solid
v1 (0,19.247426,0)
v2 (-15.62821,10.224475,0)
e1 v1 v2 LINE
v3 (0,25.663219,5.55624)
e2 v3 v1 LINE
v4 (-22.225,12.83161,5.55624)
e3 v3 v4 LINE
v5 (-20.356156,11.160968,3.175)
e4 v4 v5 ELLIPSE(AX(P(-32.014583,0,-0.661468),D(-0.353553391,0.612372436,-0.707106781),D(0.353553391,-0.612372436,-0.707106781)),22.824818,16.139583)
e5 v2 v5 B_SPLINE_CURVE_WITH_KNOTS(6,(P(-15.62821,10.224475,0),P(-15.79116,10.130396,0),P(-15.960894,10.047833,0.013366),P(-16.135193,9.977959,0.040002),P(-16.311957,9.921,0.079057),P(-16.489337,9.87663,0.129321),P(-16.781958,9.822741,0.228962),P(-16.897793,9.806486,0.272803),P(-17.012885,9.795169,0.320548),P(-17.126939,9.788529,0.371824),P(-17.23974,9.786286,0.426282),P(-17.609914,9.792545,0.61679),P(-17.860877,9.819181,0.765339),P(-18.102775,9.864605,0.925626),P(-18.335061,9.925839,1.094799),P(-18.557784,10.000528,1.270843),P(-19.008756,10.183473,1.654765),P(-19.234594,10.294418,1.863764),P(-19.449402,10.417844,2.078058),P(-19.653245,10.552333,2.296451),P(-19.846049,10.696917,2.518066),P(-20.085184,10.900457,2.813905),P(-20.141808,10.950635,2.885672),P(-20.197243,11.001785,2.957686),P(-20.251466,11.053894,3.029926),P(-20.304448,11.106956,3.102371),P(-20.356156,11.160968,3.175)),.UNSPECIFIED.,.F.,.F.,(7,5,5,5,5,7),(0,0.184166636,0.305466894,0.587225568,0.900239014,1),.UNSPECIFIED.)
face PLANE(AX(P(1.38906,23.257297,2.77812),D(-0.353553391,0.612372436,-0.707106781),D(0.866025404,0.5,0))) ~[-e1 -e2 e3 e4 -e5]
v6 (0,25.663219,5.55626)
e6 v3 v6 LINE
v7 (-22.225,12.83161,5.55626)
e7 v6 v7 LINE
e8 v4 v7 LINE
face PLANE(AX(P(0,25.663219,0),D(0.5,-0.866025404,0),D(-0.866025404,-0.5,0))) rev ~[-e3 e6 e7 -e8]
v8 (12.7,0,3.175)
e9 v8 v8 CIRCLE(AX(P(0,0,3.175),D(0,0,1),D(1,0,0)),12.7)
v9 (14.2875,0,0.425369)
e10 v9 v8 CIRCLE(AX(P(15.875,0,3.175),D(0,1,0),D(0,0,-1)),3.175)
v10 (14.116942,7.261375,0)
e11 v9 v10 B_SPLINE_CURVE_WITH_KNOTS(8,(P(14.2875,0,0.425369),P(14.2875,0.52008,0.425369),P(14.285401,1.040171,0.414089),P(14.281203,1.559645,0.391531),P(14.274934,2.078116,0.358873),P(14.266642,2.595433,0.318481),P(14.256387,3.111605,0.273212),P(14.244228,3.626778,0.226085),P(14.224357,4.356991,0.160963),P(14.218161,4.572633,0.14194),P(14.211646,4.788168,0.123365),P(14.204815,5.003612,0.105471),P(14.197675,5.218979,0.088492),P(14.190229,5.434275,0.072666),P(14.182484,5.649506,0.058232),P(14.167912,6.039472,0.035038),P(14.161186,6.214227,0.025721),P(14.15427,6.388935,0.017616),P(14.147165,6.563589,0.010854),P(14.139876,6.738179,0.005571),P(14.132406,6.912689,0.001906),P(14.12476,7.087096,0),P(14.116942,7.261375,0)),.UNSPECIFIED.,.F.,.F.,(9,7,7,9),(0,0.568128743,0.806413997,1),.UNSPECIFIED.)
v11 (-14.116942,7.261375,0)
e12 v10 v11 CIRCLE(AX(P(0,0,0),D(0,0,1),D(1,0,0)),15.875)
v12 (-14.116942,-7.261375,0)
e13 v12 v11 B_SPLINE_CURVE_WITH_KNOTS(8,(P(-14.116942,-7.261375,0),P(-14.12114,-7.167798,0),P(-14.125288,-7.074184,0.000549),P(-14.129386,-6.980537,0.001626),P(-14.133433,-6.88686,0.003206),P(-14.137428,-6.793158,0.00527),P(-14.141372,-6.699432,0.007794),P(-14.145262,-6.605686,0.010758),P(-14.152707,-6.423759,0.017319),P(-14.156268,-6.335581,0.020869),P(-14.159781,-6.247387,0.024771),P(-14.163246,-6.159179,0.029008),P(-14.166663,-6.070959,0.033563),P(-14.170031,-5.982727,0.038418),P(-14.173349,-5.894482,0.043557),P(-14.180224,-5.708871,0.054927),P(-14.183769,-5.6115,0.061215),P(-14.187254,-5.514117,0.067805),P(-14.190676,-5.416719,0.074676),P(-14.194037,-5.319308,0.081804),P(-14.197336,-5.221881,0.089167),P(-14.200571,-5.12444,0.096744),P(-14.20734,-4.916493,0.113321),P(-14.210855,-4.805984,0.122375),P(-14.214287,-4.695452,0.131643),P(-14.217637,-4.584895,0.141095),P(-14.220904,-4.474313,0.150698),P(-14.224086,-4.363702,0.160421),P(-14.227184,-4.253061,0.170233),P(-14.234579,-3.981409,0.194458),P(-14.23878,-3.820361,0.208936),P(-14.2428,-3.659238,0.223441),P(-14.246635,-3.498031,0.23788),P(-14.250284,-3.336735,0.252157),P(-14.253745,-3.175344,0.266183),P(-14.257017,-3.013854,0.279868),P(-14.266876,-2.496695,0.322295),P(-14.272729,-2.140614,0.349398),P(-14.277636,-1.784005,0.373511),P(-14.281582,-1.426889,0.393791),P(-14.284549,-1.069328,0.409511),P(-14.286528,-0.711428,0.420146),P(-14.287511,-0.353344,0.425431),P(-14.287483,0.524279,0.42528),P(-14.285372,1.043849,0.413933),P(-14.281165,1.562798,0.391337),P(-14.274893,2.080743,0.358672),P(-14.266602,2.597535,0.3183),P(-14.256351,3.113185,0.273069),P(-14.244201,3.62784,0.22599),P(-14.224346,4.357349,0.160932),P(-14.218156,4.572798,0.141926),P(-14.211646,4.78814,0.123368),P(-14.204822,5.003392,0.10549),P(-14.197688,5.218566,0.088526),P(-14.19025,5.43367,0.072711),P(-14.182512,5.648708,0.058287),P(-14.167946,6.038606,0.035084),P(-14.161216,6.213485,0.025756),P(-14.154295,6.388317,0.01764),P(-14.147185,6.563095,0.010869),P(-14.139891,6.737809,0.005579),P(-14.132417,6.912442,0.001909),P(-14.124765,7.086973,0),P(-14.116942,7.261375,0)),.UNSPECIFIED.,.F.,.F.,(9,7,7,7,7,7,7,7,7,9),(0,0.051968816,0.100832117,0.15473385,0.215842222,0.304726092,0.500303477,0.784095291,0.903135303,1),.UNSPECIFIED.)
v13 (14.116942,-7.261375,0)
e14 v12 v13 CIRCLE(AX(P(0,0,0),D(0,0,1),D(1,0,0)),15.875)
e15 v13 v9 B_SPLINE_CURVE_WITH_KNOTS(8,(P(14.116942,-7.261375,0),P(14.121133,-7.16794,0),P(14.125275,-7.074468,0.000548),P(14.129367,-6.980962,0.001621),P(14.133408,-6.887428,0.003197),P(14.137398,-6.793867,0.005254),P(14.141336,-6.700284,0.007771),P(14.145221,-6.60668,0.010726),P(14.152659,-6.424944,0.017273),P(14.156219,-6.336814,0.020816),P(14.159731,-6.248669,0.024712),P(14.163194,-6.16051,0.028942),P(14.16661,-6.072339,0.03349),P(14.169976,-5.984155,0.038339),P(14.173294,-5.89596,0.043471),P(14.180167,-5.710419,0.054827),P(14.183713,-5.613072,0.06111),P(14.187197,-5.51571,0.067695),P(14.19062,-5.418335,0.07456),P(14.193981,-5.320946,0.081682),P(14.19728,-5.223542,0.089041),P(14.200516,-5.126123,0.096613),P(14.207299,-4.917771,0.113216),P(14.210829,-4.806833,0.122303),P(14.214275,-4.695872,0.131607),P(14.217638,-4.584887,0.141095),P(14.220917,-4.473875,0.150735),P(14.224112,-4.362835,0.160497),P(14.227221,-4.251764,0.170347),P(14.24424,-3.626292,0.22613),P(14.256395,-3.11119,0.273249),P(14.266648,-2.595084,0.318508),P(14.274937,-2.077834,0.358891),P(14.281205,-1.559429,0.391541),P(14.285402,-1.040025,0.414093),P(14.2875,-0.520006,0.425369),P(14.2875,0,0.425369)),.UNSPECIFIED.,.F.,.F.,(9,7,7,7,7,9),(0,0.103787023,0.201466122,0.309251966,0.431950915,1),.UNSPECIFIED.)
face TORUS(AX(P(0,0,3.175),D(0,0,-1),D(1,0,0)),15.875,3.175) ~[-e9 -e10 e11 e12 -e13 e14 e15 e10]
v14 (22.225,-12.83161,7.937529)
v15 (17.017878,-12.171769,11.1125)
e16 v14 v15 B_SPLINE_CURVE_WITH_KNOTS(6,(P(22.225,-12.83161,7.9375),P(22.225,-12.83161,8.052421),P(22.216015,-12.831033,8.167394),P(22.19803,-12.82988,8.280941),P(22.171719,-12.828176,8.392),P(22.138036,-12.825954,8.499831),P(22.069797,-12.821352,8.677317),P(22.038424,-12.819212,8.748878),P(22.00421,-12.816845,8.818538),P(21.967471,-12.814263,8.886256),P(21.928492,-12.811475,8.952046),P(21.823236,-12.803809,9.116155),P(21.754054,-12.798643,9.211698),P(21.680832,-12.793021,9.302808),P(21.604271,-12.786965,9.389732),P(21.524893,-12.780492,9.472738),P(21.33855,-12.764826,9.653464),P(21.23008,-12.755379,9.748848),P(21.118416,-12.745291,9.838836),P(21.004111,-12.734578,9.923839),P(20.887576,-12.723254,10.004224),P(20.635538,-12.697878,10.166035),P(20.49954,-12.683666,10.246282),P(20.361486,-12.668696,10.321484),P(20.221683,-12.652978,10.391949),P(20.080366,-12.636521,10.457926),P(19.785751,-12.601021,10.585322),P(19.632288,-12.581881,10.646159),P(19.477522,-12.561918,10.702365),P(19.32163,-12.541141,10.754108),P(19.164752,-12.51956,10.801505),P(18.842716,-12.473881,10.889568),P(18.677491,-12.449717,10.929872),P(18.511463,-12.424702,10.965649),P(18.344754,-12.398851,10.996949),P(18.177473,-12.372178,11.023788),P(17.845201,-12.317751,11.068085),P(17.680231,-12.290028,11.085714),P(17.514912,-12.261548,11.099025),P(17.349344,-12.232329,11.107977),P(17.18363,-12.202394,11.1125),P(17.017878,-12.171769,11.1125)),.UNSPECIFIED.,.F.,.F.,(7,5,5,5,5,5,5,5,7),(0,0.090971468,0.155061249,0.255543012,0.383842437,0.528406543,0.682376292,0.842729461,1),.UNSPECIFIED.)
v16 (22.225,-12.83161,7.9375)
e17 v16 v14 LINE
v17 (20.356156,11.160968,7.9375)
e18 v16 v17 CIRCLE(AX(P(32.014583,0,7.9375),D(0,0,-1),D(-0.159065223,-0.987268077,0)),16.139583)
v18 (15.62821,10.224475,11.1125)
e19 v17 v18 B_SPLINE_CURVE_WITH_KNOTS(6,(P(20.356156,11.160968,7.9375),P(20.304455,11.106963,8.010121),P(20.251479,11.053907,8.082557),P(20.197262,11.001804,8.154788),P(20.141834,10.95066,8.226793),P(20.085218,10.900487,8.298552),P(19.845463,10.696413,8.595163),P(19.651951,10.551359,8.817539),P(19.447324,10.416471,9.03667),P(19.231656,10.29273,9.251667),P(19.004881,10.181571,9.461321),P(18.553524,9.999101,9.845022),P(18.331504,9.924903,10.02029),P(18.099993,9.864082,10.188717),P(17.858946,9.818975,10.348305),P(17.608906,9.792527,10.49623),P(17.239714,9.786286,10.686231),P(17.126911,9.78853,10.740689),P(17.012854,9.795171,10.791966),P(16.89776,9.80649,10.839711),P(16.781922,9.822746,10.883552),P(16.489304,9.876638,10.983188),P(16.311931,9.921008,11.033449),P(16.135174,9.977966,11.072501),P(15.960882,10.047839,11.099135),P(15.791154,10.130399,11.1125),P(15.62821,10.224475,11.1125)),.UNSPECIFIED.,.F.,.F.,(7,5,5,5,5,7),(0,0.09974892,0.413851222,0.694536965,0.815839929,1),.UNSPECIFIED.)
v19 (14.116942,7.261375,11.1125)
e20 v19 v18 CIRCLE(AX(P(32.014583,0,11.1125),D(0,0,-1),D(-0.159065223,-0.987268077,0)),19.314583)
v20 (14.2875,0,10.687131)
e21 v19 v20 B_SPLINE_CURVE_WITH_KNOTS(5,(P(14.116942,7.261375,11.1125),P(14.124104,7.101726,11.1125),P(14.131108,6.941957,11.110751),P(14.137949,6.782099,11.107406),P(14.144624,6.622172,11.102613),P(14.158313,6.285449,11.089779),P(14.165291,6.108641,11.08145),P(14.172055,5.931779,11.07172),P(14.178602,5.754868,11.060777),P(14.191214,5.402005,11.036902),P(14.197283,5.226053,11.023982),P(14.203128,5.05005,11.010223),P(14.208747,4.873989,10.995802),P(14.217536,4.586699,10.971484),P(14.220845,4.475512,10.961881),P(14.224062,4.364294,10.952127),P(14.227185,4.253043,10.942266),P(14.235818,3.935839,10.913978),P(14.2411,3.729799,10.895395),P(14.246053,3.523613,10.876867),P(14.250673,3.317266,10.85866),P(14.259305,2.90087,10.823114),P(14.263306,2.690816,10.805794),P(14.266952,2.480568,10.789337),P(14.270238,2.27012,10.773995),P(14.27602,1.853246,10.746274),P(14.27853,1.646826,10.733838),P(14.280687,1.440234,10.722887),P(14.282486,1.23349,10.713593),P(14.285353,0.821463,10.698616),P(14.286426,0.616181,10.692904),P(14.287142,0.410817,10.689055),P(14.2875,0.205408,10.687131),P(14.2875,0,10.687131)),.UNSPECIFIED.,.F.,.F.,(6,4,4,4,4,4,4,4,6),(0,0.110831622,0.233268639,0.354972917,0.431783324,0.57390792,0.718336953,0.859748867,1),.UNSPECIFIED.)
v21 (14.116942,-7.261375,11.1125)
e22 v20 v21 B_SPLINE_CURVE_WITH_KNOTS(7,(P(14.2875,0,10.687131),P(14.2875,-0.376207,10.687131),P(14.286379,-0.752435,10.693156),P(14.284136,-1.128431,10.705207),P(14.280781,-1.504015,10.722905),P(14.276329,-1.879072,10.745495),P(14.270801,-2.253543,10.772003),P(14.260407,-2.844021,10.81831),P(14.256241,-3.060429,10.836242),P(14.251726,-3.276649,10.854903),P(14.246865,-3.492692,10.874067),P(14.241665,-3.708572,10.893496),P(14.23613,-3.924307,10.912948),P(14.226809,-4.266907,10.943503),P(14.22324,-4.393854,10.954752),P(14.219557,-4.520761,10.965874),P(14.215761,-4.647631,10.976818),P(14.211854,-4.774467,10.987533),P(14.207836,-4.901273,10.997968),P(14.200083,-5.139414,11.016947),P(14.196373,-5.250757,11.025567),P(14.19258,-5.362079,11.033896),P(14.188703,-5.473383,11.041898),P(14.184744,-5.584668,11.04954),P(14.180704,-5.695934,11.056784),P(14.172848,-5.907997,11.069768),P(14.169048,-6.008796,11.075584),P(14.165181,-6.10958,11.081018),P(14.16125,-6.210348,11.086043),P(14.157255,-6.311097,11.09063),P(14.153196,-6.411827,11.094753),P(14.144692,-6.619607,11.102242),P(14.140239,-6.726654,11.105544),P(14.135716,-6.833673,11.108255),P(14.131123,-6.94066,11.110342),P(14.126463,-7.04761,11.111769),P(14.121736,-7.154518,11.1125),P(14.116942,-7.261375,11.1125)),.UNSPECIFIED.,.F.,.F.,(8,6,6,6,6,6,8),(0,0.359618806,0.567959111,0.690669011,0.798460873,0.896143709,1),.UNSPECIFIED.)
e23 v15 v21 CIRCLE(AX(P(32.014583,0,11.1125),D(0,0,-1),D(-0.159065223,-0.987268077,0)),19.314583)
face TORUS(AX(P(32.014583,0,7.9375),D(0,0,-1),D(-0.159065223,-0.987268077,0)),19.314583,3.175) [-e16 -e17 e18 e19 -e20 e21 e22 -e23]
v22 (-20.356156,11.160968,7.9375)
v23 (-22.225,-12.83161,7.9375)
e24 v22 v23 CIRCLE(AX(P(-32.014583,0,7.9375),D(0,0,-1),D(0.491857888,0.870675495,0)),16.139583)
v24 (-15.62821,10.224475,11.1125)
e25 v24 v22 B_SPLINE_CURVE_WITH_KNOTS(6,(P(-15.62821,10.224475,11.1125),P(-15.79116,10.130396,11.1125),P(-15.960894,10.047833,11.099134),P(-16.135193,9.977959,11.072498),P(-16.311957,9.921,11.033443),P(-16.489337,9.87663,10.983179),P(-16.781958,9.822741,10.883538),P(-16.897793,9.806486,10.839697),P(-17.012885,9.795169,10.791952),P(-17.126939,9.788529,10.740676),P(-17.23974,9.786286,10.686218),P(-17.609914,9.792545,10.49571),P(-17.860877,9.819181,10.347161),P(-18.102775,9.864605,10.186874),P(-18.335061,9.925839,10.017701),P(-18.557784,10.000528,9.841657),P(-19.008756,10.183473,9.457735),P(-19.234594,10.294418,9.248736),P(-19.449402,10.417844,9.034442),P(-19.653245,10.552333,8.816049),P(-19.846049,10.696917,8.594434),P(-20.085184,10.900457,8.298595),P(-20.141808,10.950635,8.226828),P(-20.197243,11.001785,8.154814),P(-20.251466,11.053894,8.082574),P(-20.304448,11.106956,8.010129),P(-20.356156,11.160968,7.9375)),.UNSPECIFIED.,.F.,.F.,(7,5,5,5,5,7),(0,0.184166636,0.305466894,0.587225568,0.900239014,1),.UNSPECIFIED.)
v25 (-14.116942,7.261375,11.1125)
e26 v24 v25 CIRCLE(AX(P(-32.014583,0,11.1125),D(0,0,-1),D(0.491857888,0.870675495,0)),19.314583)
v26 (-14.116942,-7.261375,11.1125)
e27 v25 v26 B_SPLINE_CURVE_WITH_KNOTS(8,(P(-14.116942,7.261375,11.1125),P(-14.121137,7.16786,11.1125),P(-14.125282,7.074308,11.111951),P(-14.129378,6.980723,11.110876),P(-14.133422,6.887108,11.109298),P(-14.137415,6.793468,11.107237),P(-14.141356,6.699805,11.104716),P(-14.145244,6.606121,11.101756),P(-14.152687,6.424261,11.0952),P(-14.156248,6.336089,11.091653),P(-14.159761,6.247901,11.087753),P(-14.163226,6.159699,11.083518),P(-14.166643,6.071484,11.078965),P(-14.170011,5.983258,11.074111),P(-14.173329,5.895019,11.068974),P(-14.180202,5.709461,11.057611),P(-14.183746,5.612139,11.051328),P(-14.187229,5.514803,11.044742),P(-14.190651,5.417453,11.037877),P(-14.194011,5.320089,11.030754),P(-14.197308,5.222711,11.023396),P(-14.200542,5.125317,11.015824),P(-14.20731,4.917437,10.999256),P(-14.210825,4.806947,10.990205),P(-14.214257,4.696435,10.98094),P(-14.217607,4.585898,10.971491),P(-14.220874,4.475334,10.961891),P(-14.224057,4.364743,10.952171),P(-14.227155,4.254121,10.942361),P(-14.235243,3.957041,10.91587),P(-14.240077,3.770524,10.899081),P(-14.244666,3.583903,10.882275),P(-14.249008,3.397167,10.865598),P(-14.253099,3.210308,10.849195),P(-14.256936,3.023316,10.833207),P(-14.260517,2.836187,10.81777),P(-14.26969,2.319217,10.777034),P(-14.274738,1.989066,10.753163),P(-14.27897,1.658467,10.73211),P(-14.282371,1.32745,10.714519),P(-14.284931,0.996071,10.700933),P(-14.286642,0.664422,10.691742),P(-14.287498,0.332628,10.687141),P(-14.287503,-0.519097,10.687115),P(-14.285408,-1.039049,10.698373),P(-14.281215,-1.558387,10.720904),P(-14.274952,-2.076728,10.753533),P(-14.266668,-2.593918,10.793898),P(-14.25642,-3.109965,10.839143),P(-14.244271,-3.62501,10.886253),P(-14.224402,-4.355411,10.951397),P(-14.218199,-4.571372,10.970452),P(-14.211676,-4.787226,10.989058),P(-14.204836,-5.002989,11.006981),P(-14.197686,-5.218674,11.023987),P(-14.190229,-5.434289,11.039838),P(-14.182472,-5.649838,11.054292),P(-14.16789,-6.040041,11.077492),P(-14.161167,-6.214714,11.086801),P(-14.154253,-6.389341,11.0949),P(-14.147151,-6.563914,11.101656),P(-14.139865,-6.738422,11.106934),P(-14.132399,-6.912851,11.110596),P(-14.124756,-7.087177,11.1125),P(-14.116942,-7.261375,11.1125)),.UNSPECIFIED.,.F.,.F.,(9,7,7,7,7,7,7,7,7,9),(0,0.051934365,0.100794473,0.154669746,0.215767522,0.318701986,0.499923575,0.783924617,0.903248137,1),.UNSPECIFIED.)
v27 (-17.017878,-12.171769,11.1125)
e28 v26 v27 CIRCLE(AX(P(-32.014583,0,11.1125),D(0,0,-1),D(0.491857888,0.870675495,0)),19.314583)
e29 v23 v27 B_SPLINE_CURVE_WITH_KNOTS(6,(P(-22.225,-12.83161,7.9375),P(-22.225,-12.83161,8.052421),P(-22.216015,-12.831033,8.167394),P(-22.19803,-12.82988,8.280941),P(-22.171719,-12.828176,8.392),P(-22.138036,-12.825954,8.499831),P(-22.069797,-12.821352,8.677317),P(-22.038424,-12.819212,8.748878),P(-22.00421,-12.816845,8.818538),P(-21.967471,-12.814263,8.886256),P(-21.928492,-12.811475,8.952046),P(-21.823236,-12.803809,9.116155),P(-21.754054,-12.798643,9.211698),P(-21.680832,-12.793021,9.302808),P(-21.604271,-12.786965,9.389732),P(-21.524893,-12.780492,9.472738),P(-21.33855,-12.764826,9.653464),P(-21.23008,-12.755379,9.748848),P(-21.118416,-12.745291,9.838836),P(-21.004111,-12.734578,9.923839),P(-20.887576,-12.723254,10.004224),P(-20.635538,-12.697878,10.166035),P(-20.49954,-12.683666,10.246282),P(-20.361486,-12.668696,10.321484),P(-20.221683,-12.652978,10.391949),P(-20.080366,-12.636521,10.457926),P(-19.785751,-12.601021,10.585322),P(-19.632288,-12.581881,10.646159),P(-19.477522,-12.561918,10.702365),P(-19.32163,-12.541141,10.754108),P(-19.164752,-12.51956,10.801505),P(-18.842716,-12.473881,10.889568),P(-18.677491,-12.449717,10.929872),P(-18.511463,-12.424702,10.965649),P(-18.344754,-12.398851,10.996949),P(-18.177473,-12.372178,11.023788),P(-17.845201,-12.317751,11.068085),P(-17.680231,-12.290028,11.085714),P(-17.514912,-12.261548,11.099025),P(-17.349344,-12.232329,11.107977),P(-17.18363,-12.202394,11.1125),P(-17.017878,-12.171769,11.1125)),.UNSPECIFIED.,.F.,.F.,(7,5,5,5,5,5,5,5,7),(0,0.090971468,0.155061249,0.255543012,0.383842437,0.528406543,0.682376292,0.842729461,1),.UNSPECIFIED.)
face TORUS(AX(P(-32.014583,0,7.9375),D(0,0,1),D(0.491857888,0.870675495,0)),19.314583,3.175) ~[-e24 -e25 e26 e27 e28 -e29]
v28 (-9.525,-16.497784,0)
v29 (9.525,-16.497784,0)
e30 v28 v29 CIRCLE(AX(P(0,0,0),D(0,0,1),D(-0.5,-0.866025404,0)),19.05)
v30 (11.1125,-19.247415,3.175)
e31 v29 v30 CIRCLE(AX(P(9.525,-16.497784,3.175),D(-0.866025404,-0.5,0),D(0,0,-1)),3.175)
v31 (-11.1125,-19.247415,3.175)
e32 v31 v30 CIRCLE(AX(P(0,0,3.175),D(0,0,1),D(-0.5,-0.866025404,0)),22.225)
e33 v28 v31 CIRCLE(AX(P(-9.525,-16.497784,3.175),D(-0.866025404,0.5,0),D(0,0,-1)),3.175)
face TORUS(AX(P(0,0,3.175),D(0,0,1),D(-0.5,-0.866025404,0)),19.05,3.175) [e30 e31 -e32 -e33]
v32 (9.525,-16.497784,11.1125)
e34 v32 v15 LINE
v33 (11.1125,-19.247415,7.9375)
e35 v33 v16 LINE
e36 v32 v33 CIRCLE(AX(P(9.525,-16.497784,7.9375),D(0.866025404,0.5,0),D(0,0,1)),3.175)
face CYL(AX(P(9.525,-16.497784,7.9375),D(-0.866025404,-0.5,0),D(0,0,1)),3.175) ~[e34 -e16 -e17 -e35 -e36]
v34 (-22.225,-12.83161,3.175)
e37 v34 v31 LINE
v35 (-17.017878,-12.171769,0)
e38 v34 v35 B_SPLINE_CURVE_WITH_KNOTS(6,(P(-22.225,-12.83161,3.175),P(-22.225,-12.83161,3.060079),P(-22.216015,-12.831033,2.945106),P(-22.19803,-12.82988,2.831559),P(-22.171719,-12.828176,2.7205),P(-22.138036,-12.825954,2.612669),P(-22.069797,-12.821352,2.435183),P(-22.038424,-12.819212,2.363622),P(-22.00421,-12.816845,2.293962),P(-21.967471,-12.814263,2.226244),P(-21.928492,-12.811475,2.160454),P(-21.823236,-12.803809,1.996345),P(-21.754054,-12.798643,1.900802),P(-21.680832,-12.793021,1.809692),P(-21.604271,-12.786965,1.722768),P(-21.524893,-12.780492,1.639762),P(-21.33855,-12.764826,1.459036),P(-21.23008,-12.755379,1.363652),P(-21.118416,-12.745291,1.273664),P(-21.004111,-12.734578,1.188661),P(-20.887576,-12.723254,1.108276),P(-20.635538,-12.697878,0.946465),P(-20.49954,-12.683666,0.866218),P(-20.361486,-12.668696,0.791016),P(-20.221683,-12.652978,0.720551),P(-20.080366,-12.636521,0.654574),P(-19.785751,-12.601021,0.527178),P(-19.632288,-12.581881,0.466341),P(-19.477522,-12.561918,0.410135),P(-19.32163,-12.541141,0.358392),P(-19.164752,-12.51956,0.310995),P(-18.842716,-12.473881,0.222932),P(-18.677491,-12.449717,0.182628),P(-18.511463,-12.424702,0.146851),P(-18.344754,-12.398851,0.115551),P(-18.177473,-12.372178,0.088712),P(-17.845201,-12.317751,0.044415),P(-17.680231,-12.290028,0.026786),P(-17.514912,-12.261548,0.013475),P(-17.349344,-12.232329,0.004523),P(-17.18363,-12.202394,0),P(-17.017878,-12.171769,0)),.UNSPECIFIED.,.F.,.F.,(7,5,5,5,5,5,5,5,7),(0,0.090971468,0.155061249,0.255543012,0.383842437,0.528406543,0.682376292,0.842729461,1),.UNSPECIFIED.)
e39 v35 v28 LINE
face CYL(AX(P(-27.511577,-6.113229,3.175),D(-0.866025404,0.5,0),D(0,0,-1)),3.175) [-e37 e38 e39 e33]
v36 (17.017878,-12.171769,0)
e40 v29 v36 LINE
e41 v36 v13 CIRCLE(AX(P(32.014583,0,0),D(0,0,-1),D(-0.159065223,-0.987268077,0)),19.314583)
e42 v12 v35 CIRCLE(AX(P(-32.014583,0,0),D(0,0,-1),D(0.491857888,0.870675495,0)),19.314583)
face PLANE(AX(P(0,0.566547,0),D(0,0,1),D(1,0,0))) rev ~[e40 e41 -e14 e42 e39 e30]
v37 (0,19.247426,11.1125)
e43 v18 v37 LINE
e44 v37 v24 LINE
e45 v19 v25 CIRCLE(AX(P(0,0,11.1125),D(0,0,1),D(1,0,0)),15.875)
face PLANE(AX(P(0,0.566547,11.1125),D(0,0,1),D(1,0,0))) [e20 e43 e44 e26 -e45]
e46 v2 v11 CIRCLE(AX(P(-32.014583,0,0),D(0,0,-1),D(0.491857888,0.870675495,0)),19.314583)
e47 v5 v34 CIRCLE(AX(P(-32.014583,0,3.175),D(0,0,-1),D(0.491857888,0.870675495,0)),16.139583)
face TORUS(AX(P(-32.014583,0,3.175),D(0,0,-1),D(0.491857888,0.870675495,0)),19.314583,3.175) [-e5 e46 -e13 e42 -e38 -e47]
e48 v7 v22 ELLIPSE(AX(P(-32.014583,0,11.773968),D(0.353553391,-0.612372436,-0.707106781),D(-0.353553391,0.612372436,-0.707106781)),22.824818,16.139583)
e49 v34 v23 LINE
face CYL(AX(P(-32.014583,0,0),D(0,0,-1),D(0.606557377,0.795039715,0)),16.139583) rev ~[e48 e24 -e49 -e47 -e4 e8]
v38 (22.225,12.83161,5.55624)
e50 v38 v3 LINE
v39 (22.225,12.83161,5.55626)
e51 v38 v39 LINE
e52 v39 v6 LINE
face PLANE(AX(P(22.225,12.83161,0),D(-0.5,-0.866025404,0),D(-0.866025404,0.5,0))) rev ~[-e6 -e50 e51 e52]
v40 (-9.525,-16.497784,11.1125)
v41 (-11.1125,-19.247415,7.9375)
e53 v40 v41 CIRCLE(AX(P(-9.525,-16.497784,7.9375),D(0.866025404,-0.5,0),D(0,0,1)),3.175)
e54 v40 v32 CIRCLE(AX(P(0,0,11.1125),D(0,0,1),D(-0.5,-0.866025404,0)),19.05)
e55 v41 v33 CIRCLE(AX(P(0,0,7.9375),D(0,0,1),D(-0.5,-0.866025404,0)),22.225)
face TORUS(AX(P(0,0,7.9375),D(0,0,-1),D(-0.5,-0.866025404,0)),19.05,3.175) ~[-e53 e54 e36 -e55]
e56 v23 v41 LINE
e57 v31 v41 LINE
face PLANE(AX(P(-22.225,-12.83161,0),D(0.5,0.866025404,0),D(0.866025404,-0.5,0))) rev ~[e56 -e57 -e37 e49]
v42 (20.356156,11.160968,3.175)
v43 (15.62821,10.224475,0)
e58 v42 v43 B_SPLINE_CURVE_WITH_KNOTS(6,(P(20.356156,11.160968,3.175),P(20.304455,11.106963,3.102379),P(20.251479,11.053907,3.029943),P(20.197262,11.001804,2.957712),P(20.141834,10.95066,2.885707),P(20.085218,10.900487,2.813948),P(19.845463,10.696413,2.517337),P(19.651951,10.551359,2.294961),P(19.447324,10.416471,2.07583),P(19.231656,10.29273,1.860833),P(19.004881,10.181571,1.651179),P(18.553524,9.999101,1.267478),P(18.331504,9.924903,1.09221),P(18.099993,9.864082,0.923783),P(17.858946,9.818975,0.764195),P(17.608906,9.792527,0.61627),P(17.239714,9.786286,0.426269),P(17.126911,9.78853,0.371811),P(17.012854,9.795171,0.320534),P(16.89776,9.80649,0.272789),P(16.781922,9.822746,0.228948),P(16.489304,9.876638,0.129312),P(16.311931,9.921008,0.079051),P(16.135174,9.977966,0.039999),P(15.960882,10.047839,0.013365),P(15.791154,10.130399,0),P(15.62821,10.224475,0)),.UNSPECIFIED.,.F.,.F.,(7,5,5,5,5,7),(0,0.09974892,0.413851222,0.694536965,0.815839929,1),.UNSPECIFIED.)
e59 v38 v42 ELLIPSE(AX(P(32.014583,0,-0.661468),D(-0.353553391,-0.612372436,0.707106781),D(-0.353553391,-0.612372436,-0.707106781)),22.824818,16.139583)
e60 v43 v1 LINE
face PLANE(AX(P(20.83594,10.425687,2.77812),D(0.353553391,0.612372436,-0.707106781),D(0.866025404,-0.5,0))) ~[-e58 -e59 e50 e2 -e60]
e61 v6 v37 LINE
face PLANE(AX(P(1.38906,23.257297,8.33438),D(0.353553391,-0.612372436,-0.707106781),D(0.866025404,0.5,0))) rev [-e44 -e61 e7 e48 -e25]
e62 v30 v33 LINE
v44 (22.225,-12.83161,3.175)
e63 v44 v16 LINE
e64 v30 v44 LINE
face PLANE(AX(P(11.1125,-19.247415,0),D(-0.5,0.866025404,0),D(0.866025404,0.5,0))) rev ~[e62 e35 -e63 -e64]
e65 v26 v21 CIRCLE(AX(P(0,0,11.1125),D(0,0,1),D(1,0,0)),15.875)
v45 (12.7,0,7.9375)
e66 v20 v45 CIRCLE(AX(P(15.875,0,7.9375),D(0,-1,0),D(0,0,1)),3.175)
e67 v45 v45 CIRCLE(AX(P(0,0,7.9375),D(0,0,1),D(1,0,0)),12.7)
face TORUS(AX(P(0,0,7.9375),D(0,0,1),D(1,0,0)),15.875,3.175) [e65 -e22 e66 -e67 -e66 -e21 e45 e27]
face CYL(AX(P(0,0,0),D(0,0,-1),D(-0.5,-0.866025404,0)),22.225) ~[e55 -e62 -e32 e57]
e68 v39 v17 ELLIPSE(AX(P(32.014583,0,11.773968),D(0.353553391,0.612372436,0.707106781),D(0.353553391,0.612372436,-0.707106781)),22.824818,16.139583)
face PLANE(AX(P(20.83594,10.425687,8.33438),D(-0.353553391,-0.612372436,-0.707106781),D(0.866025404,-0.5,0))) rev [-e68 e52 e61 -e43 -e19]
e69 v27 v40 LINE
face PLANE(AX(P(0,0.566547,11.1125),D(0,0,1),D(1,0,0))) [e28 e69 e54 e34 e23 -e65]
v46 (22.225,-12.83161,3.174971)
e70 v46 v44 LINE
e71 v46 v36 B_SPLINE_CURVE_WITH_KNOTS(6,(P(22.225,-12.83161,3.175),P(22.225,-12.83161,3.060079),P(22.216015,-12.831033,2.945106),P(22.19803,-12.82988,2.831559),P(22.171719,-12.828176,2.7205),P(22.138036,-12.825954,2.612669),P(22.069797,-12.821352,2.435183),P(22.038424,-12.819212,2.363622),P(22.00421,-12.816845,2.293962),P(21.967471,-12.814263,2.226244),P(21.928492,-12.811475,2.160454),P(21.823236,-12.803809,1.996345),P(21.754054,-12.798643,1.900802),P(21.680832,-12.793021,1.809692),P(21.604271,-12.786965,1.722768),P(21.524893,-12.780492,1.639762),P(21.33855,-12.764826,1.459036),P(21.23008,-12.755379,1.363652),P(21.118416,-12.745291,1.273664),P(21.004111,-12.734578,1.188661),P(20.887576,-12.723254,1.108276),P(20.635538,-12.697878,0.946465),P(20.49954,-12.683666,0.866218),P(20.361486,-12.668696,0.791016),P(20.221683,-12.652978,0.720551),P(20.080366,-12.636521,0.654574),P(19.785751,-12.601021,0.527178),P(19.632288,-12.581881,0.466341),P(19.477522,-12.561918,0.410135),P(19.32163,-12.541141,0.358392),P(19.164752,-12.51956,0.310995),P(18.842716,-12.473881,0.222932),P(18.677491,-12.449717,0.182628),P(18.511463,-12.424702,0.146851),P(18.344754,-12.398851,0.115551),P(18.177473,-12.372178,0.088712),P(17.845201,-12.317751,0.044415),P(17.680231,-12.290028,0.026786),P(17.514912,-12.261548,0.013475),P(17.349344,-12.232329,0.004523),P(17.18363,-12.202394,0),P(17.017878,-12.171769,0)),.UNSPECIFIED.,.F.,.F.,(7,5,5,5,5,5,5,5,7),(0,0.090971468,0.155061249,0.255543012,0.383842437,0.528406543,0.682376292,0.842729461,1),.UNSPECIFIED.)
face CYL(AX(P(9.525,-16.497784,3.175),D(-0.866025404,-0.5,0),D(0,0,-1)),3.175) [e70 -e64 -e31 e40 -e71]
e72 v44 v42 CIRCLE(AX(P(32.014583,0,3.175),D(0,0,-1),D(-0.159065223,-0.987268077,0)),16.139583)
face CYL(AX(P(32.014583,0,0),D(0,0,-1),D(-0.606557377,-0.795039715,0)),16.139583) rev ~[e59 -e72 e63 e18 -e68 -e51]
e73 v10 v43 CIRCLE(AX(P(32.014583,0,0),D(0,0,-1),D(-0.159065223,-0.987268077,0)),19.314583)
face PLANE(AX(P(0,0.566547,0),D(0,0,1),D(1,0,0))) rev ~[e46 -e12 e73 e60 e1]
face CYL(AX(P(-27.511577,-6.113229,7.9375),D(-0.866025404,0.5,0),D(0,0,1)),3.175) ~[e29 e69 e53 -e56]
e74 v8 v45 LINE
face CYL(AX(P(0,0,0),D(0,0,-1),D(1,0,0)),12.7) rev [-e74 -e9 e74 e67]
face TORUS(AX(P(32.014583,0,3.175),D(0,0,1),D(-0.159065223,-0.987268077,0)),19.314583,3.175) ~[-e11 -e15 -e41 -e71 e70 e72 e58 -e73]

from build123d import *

# Parameters (mm, degrees)
F0_R         = 12.7
F1_DEPTH     = 11.1125
F2_SIZE      = 5.55624
F3_T1_DEPTH  = 20.7691097327
F3_T3_DEPTH  = 20.7691097327
F3_T10_ANGLE = 141.384588939
F3_T12_ANGLE = 141.384588939
F3_T14_ANGLE = 60
F3_T16_ANGLE = 60
F3_T18_ANGLE = 141.384588939
F3_T20_ANGLE = 141.384588939


# Not quite as in the source:
# - a fillet or chamfer that OpenCascade refuses, or shapes differently, is made with other operations: its cross-section is extruded or revolved along the edge and cut away or added
# - a fillet or chamfer is up to 0.001 mm smaller than in the source, because OpenCascade refuses the exact size


with BuildPart() as f1:
    # F0 (on Top) → F1 (new body)
    with BuildSketch(Plane.XY):
        with BuildLine():
            Line((0, 25.6632194655), (-22.225, 12.8316097327))
            ThreePointArc((-22.225, 12.8316097327), (-15.875, 0), (-22.225, -12.8316097327))
            Line((-22.225, -12.8316097327), (-11.1125, -19.2474145991))
            ThreePointArc((-11.1125, -19.2474145991), (0, -22.225), (11.1125, -19.2474145991))
            Line((11.1125, -19.2474145991), (22.225, -12.8316097327))
            ThreePointArc((22.225, -12.8316097327), (15.875, 0), (22.225, 12.8316097327))
            Line((22.225, 12.8316097327), (0, 25.6632194655))
        make_face()
        Circle(F0_R, mode=Mode.SUBTRACT)
    extrude(amount=F1_DEPTH)

    # F2 (size 5.55625 in the source; OpenCascade refuses exactly that, so slightly less here)
    f2_edges = [f1.edges().sort_by_distance(p)[0] for p in [
        (11.1125, 19.247415, 0),
        (11.1125, 19.247415, 11.1125),
        (-11.1125, 19.247415, 11.1125),
        (-11.1125, 19.247415, 0),
    ]]
    chamfer(f2_edges, length=F2_SIZE)

    # F3: fillet of radius 3.175 on 13 edges, made by hand

    # F3_s2 → F3_t1 (cut)
    with BuildSketch(Plane(origin=(-17.9865766425, 10.3845548664, 0), x_dir=(0, 0, 1), z_dir=(0.8660254038, -0.5, 0))):
        with BuildLine():
            ThreePointArc((11.1125, 19.05), (10.1825640303, 21.2950640303), (7.9375, 22.225))
            Line((7.9375, 22.225), (11.1125, 22.225))
            Line((11.1125, 22.225), (11.1125, 19.05))
        make_face()
        with BuildLine():
            ThreePointArc((0, 19.05), (0.9299359697, 21.2950640303), (3.175, 22.225))
            Line((3.175, 22.225), (0, 22.225))
            Line((0, 22.225), (0, 19.05))
        make_face()
    extrude(amount=F3_T1_DEPTH, mode=Mode.SUBTRACT)

    # F3_s4 → F3_t3 (cut)
    with BuildSketch(Plane(origin=(0, 0, 0), x_dir=(0, 0, 1), z_dir=(0.8660254038, 0.5, 0))):
        with BuildLine():
            ThreePointArc((0, 19.05), (0.9299359697, 21.2950640303), (3.175, 22.225))
            Line((3.175, 22.225), (0, 22.225))
            Line((0, 22.225), (0, 19.05))
        make_face()
        with BuildLine():
            ThreePointArc((11.1125, 19.05), (10.1825640303, 21.2950640303), (7.9375, 22.225))
            Line((7.9375, 22.225), (11.1125, 22.225))
            Line((11.1125, 22.225), (11.1125, 19.05))
        make_face()
    extrude(amount=F3_T3_DEPTH, mode=Mode.SUBTRACT)

    # F3_s5 → F3_t6 (revolve, cut)
    with BuildSketch(Plane.XZ):
        with BuildLine():
            ThreePointArc((15.875, 0), (13.6299359697, 0.9299359697), (12.7, 3.175))
            Line((12.7, 3.175), (12.7, 0))
            Line((12.7, 0), (15.875, 0))
        make_face()
    revolve(axis=Axis((0, 0, 0), (0, 0, 1)), mode=Mode.SUBTRACT)

    # F3_s7 → F3_t8 (revolve, cut)
    with BuildSketch(Plane.XZ):
        with BuildLine():
            ThreePointArc((15.875, 11.1125), (13.6299359697, 10.1825640303), (12.7, 7.9375))
            Line((12.7, 7.9375), (12.7, 11.1125))
            Line((12.7, 11.1125), (15.875, 11.1125))
        make_face()
    revolve(axis=Axis((0, 0, 11.1125), (0, 0, 1)), mode=Mode.SUBTRACT)

    # F3_s9 → F3_t10 (revolve, cut)
    with BuildSketch(Plane(origin=(-24.2694814431, 13.7102008228, 0), x_dir=(0, 0, 1), z_dir=(-0.8706754951, 0.4918578882, 0))):
        with BuildLine():
            ThreePointArc((11.1125, 3.567957984), (10.1825640303, 1.3228939538), (7.9375, 0.392957984))
            Line((7.9375, 0.392957984), (11.1125, 0.392957984))
            Line((11.1125, 0.392957984), (11.1125, 3.567957984))
        make_face()
    revolve(axis=Axis((-32.0145833333, 0, 11.1125), (0, 0, -1)), revolution_arc=F3_T10_ANGLE, mode=Mode.SUBTRACT)

    # F3_s11 → F3_t12 (revolve, cut)
    with BuildSketch(Plane(origin=(-24.2694814431, 13.7102008228, 0), x_dir=(0, 0, 1), z_dir=(-0.8706754951, 0.4918578882, 0))):
        with BuildLine():
            ThreePointArc((0, 3.567957984), (0.9299359697, 1.3228939538), (3.175, 0.392957984))
            Line((3.175, 0.392957984), (0, 0.392957984))
            Line((0, 0.392957984), (0, 3.567957984))
        make_face()
    revolve(axis=Axis((-32.0145833333, 0, 0), (0, 0, -1)), revolution_arc=F3_T12_ANGLE, mode=Mode.SUBTRACT)

    # F3_s13 → F3_t14 (revolve, cut)
    with BuildSketch(Plane(origin=(0, 0, 0), x_dir=(0, 0, 1), z_dir=(-0.8660254038, 0.5, 0))):
        with BuildLine():
            ThreePointArc((11.1125, -19.05), (10.1825640303, -21.2950640303), (7.9375, -22.225))
            Line((7.9375, -22.225), (11.1125, -22.225))
            Line((11.1125, -22.225), (11.1125, -19.05))
        make_face()
    revolve(axis=Axis((0, 0, 11.1125), (0, 0, 1)), revolution_arc=F3_T14_ANGLE, mode=Mode.SUBTRACT)

    # F3_s15 → F3_t16 (revolve, cut)
    with BuildSketch(Plane(origin=(0, 0, 0), x_dir=(0, 0, 1), z_dir=(-0.8660254038, 0.5, 0))):
        with BuildLine():
            ThreePointArc((0, -19.05), (0.9299359697, -21.2950640303), (3.175, -22.225))
            Line((3.175, -22.225), (0, -22.225))
            Line((0, -22.225), (0, -19.05))
        make_face()
    revolve(axis=Axis((0, 0, 0), (0, 0, 1)), revolution_arc=F3_T16_ANGLE, mode=Mode.SUBTRACT)

    # F3_s17 → F3_t18 (revolve, cut)
    with BuildSketch(Plane(origin=(31.2045585083, -5.0275706902, 0), x_dir=(0, 0, 1), z_dir=(0.9872680765, -0.1590652226, 0))):
        with BuildLine():
            ThreePointArc((3.175, 11.0471765092), (0.9299359697, 11.977112479), (0, 14.2221765092))
            Line((0, 14.2221765092), (0, 11.0471765092))
            Line((0, 11.0471765092), (3.175, 11.0471765092))
        make_face()
    revolve(axis=Axis((32.0145833333, 0, 0), (0, 0, -1)), revolution_arc=F3_T18_ANGLE, mode=Mode.SUBTRACT)

    # F3_s19 → F3_t20 (revolve, cut)
    with BuildSketch(Plane(origin=(31.2045585083, -5.0275706902, 0), x_dir=(0, 0, 1), z_dir=(0.9872680765, -0.1590652226, 0))):
        with BuildLine():
            ThreePointArc((7.9375, 11.0471765092), (10.1825640303, 11.977112479), (11.1125, 14.2221765092))
            Line((11.1125, 14.2221765092), (11.1125, 11.0471765092))
            Line((11.1125, 11.0471765092), (7.9375, 11.0471765092))
        make_face()
    revolve(axis=Axis((32.0145833333, 0, 11.1125), (0, 0, -1)), revolution_arc=F3_T20_ANGLE, mode=Mode.SUBTRACT)


solid = f1.part
